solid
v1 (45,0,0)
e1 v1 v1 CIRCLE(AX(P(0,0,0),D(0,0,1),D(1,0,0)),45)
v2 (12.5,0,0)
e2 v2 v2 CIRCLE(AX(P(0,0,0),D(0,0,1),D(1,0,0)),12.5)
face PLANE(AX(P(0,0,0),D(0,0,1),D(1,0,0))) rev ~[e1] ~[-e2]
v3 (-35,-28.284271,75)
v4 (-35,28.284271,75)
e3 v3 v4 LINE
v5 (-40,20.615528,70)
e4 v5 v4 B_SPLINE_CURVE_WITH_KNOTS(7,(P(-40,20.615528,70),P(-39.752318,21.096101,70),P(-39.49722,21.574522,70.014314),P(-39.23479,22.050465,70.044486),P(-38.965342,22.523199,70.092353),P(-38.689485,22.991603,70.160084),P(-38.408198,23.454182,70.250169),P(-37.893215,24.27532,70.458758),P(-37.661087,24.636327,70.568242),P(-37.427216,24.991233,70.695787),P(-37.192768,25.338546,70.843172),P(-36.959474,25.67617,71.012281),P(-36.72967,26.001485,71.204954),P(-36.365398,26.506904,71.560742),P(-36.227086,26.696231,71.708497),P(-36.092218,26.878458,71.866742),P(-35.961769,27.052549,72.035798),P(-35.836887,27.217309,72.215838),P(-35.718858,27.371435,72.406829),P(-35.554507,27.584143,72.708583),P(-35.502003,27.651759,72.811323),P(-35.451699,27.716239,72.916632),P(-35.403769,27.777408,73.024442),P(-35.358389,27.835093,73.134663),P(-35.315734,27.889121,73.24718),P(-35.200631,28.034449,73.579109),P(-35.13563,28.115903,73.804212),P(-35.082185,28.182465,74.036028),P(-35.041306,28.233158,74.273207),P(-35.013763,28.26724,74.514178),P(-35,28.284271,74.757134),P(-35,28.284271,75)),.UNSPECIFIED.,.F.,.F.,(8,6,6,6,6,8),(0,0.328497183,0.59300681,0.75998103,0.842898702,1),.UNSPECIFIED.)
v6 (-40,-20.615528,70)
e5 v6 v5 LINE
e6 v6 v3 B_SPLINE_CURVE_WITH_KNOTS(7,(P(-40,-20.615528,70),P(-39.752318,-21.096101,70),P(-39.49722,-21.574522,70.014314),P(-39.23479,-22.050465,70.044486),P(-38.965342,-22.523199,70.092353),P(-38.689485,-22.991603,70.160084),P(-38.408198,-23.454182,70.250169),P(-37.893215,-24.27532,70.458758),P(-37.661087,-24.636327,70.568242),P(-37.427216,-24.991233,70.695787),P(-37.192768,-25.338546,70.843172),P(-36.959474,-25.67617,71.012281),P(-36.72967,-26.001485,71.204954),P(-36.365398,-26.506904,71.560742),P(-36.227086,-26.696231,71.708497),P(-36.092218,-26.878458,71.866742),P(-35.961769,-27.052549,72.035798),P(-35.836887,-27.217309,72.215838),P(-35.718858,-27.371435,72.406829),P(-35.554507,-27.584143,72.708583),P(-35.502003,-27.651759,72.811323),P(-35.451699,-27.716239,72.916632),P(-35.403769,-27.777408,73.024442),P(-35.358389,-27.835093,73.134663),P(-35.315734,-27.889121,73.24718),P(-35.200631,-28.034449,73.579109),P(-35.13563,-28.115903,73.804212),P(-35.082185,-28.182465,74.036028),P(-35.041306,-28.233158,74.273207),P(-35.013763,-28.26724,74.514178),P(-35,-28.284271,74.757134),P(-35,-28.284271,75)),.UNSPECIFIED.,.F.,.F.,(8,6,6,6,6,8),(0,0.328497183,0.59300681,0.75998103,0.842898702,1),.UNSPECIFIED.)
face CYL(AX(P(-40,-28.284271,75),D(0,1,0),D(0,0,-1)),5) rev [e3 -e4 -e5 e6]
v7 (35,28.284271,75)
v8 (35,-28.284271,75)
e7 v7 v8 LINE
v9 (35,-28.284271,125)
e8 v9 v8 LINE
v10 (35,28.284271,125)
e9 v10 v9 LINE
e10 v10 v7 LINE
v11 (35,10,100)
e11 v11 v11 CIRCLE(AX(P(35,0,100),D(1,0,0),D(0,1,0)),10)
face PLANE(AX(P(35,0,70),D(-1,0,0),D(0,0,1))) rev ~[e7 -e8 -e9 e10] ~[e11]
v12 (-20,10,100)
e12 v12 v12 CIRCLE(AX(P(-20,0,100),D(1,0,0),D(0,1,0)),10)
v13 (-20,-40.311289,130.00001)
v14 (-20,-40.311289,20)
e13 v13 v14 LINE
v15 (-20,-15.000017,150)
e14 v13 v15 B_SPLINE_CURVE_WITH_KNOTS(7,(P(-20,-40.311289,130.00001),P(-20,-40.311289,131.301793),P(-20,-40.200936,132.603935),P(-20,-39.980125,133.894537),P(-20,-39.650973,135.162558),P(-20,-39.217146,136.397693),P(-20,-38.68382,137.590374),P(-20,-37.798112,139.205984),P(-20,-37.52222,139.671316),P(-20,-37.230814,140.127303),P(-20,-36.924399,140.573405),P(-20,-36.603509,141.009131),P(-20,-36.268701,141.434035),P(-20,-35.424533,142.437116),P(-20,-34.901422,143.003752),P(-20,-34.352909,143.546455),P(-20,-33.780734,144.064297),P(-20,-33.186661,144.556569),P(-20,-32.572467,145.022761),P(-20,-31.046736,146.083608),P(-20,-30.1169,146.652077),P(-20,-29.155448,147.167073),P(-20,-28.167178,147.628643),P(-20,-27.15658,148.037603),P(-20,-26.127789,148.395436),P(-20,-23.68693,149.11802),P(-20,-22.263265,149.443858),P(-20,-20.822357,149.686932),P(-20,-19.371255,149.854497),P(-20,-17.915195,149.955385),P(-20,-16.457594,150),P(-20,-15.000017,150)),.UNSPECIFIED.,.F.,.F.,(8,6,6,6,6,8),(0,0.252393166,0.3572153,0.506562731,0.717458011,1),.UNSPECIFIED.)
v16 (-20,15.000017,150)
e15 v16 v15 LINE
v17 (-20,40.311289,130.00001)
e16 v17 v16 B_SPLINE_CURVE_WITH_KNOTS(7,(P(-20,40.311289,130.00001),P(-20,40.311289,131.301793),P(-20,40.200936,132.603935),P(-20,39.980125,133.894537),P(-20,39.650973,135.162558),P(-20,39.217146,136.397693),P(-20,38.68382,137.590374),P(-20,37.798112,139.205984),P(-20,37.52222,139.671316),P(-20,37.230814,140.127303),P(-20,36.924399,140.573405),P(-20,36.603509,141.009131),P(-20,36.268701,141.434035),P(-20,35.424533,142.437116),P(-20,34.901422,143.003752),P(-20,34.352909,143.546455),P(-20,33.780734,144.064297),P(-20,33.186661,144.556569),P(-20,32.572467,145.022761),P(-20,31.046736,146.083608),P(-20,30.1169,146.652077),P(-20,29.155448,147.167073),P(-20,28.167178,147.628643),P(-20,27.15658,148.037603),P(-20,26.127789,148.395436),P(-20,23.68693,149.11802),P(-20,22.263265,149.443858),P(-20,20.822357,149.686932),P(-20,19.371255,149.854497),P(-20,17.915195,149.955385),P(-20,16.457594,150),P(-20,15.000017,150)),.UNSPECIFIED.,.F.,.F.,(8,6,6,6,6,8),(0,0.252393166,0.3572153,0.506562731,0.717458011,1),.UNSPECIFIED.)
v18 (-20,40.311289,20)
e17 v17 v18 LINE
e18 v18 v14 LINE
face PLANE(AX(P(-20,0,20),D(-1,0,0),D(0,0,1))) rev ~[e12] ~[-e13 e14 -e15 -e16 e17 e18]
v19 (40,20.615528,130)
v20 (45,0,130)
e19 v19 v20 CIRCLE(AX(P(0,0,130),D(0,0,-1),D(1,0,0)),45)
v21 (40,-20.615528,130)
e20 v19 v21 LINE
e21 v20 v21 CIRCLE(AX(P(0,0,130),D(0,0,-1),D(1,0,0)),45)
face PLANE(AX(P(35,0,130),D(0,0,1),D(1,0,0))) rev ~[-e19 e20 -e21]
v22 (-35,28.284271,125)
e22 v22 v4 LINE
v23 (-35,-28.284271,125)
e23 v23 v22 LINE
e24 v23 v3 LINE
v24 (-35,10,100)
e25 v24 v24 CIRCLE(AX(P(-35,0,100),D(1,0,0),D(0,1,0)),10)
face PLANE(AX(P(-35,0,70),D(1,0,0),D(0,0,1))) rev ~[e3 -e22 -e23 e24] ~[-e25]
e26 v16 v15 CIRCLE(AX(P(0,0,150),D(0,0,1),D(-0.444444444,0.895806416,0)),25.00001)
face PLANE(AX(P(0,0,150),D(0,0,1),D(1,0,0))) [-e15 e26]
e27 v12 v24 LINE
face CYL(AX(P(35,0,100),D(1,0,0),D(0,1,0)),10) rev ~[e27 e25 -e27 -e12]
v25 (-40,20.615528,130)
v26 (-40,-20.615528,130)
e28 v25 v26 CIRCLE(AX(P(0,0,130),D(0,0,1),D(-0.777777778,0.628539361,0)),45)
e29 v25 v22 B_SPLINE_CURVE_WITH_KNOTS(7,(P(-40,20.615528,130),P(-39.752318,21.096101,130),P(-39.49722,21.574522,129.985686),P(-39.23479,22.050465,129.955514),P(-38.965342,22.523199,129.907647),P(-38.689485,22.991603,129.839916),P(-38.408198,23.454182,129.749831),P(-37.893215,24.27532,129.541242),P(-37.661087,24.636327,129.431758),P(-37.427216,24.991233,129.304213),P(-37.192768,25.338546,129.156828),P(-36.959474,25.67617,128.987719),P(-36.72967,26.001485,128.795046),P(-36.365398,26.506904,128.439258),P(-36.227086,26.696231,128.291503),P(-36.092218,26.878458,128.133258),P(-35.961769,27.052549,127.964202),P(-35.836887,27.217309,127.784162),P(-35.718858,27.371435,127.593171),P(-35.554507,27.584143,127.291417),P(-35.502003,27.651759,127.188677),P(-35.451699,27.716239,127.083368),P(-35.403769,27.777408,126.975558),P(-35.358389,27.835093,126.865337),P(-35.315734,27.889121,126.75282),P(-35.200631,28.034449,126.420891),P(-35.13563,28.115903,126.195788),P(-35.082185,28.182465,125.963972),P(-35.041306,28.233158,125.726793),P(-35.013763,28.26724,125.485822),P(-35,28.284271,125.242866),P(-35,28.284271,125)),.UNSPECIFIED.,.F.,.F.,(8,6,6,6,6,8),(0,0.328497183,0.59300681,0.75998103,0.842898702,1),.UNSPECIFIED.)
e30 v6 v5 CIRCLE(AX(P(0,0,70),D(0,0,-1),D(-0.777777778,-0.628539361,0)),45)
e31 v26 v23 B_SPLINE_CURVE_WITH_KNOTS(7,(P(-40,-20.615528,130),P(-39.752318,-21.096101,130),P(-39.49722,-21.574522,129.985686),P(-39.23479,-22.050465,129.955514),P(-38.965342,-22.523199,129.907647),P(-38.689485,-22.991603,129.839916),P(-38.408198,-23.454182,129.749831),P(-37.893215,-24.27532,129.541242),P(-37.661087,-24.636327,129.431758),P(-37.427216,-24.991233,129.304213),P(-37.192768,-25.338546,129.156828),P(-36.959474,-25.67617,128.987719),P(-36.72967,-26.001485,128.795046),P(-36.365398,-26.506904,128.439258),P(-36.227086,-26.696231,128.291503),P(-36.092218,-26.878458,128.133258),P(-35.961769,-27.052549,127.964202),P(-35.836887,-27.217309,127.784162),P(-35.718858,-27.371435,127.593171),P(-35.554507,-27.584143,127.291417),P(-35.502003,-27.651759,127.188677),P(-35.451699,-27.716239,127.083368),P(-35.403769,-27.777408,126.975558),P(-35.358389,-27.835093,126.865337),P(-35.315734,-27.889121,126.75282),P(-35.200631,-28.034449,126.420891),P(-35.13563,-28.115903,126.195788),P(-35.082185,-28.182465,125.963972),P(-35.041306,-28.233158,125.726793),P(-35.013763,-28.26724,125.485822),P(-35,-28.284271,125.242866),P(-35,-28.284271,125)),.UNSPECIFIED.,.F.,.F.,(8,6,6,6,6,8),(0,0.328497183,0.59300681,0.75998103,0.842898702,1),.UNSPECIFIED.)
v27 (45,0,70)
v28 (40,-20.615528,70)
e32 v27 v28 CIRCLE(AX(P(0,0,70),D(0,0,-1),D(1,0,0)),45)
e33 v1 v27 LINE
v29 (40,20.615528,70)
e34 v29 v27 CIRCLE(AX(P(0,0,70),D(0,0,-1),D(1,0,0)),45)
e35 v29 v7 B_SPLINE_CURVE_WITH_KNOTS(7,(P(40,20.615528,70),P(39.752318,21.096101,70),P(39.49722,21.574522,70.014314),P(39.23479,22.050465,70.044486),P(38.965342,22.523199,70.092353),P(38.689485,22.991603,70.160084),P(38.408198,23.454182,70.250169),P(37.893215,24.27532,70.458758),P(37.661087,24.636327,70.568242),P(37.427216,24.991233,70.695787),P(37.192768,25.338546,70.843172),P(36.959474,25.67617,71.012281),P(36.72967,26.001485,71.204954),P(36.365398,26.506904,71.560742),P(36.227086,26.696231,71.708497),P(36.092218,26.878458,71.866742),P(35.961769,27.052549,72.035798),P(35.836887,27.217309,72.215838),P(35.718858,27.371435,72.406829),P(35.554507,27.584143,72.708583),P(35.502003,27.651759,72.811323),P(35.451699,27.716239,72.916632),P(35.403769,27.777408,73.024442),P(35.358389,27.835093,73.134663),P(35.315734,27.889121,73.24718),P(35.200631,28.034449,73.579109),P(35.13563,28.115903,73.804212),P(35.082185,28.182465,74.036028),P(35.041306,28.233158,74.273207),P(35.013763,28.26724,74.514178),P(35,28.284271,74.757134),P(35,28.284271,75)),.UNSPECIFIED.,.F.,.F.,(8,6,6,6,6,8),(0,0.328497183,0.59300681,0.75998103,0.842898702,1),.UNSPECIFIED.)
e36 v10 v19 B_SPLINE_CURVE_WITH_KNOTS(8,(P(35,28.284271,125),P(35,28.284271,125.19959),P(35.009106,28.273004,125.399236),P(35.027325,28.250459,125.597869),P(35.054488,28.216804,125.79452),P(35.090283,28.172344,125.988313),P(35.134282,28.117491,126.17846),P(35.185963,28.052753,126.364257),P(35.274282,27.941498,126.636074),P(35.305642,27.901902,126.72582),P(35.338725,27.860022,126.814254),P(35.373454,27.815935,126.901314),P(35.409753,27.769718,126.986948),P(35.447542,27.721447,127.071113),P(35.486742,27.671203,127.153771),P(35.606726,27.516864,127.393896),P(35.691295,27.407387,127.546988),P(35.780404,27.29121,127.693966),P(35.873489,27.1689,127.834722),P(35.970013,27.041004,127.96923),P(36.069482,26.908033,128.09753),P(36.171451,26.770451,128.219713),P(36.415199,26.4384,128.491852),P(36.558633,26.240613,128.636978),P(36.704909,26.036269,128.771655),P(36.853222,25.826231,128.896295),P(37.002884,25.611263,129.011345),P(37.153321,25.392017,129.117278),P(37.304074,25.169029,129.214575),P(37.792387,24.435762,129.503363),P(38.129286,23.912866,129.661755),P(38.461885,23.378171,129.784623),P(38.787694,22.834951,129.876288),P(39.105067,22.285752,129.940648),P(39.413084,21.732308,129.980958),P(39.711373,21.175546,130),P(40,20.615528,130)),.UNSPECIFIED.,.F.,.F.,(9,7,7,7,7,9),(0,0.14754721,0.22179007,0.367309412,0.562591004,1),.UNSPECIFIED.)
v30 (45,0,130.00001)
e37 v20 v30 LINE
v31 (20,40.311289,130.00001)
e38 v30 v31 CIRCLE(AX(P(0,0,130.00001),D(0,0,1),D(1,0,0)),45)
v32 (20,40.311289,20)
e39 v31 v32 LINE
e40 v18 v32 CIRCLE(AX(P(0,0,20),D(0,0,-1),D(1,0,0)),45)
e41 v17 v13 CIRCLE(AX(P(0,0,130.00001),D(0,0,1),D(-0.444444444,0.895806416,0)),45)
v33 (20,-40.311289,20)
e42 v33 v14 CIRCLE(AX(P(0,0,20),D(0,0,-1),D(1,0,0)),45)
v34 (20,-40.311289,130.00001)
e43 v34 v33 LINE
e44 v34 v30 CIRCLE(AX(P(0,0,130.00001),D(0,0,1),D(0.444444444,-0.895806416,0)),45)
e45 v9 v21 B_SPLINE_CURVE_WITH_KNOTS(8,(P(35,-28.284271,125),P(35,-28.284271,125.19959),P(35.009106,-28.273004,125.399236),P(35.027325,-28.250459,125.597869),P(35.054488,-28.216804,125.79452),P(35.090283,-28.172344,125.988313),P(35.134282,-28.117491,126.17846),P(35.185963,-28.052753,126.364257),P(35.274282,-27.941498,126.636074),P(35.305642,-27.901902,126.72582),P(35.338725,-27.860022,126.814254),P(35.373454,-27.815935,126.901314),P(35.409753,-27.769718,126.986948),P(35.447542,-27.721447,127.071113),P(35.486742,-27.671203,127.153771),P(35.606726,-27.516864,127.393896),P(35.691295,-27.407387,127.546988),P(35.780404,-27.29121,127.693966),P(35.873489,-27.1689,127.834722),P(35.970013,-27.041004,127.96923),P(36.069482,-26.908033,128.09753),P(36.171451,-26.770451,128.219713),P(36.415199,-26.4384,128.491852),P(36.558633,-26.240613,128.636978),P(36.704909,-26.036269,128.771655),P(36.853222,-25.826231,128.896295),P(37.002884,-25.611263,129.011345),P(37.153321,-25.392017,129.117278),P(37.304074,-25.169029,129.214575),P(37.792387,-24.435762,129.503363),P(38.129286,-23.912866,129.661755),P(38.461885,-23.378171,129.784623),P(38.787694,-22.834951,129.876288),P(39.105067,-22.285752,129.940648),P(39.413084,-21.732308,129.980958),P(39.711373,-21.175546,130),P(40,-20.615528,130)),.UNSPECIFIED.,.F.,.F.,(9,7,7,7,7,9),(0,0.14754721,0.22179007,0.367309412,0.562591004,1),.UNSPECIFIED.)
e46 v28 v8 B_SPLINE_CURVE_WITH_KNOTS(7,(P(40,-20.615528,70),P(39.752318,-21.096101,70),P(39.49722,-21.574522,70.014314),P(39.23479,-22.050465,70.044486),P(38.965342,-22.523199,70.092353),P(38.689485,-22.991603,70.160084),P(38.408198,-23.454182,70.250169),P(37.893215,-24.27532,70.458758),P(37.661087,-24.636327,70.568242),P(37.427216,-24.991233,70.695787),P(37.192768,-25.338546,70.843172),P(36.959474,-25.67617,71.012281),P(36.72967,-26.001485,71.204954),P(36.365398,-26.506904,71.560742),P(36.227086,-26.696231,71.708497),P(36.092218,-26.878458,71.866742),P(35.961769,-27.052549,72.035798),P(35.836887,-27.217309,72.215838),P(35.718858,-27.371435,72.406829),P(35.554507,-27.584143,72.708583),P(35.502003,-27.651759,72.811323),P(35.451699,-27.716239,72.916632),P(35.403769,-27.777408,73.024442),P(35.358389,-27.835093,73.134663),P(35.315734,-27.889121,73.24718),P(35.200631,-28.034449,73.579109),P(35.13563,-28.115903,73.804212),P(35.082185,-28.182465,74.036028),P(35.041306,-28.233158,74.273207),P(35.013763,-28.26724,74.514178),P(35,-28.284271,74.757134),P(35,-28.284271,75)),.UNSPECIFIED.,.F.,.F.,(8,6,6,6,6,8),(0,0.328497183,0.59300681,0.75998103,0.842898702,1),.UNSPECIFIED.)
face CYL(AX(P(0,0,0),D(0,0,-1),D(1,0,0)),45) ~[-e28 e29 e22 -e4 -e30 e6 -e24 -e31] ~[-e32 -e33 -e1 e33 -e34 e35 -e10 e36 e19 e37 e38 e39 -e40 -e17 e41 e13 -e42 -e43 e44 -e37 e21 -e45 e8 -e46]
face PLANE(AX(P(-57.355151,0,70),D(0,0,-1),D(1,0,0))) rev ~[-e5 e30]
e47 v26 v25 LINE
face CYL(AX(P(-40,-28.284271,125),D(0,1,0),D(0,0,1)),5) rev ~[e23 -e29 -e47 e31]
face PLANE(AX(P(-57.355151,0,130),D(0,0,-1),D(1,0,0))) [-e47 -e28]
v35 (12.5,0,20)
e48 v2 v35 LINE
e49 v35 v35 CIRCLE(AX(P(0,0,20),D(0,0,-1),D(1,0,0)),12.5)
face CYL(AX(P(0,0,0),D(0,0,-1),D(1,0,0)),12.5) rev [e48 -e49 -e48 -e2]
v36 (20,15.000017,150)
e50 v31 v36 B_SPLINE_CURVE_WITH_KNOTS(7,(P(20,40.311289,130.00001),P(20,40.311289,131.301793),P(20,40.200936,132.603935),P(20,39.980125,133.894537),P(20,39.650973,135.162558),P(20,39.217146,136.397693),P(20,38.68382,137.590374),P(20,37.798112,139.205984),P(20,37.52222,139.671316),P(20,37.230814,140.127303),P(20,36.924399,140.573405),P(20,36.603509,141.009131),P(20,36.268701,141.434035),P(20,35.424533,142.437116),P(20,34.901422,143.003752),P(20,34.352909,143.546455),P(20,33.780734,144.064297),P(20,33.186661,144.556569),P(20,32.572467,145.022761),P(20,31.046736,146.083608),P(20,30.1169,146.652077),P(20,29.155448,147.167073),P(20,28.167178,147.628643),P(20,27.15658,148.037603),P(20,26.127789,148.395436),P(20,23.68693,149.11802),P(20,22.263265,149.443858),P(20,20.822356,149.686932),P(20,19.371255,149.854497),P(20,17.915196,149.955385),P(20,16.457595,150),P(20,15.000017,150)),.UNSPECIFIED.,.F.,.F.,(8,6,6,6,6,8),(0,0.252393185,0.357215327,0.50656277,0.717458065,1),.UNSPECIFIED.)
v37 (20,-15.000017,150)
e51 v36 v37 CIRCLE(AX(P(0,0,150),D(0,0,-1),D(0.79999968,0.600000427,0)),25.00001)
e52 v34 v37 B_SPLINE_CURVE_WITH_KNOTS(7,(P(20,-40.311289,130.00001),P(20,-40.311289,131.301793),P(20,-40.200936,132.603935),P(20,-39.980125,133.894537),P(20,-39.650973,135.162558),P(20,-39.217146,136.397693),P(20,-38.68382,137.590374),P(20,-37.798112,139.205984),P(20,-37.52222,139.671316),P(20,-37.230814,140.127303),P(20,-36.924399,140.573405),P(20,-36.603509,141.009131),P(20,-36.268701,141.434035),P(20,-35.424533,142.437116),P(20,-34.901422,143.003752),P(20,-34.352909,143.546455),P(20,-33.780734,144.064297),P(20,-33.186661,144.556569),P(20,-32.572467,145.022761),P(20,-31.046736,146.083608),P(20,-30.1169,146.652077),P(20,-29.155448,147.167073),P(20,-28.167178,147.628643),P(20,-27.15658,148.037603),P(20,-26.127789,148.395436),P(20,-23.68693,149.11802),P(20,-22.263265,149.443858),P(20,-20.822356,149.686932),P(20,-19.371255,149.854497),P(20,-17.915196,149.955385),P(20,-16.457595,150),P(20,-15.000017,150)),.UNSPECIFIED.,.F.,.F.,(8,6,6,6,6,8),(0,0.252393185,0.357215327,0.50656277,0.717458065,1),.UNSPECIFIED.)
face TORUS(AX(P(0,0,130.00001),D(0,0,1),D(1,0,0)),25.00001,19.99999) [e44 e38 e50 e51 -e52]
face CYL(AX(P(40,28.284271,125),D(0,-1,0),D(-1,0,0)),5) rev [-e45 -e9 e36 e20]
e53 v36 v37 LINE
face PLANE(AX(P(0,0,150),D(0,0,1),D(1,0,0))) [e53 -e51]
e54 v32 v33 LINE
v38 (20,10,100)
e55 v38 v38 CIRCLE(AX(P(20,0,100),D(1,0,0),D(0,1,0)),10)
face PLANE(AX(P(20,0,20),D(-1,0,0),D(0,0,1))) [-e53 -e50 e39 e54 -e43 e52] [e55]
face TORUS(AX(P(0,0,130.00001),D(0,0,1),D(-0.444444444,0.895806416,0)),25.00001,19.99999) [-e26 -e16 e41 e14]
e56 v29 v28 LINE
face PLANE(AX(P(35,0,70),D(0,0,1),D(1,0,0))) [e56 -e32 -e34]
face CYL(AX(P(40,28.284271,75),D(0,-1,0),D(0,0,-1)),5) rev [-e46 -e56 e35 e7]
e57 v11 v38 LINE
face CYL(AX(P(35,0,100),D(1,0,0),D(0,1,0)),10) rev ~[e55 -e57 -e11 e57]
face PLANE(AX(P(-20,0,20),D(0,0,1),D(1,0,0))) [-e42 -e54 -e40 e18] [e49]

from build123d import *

# Parameters (mm, degrees)
F0_R          = 45
F0_R_2        = 12.5
F1_DEPTH      = 150
F2_W          = 40
F2_H          = 150
F2_W_2        = 22.3551505804
F2_H_2        = 60
F3_DEPTH      = 100
F3_DEPTH_BACK = 100
F4_R          = 19.99999
F5_R          = 5
F6_R          = 10
F7_DEPTH      = 150


# Not quite as in the source:
# - a fillet or chamfer is up to 0.001 mm smaller than in the source, because OpenCascade refuses the exact size


with BuildPart() as f1:
    # F0 (on Top) → F1 (new body)
    with BuildSketch(Plane.XY):
        Circle(F0_R)
        Circle(F0_R_2, mode=Mode.SUBTRACT)
    extrude(amount=F1_DEPTH)

    # F2 (on Front) → F3 (cut, two sides)
    with BuildSketch(Plane.XZ) as f3_sk:
        with Locations((0, 95)):
            Rectangle(F2_W, F2_H)
        with Locations((-46.1775752902, 100)):
            Rectangle(F2_W_2, F2_H_2)
        with Locations((46.1775752902, 100)):
            Rectangle(F2_W_2, F2_H_2)
    extrude(amount=-F3_DEPTH, mode=Mode.SUBTRACT)
    extrude(f3_sk.sketch, amount=F3_DEPTH_BACK, mode=Mode.SUBTRACT)

    # F4 (radius 20 in the source; OpenCascade refuses exactly that, so slightly less here)
    f4_edges = [f1.edges().sort_by_distance(p)[0] for p in [
        (-45, 0, 150),
        (38.242646, -23.717082, 150),
        (38.242646, 23.717082, 150),
    ]]
    fillet(f4_edges, radius=F4_R)

    # F5
    f5_edges = [f1.edges().sort_by_distance(p)[0] for p in [
        (-35, 0, 130),
        (-35, 0, 70),
        (35, 0, 70),
        (35, 0, 130),
    ]]
    fillet(f5_edges, radius=F5_R)

    # F6 (on face) → F7 (cut)
    with BuildSketch(Plane.YZ.offset(35)):
        with Locations((0, 100)):
            Circle(F6_R)
    extrude(amount=-F7_DEPTH, mode=Mode.SUBTRACT)


solid = f1.part
